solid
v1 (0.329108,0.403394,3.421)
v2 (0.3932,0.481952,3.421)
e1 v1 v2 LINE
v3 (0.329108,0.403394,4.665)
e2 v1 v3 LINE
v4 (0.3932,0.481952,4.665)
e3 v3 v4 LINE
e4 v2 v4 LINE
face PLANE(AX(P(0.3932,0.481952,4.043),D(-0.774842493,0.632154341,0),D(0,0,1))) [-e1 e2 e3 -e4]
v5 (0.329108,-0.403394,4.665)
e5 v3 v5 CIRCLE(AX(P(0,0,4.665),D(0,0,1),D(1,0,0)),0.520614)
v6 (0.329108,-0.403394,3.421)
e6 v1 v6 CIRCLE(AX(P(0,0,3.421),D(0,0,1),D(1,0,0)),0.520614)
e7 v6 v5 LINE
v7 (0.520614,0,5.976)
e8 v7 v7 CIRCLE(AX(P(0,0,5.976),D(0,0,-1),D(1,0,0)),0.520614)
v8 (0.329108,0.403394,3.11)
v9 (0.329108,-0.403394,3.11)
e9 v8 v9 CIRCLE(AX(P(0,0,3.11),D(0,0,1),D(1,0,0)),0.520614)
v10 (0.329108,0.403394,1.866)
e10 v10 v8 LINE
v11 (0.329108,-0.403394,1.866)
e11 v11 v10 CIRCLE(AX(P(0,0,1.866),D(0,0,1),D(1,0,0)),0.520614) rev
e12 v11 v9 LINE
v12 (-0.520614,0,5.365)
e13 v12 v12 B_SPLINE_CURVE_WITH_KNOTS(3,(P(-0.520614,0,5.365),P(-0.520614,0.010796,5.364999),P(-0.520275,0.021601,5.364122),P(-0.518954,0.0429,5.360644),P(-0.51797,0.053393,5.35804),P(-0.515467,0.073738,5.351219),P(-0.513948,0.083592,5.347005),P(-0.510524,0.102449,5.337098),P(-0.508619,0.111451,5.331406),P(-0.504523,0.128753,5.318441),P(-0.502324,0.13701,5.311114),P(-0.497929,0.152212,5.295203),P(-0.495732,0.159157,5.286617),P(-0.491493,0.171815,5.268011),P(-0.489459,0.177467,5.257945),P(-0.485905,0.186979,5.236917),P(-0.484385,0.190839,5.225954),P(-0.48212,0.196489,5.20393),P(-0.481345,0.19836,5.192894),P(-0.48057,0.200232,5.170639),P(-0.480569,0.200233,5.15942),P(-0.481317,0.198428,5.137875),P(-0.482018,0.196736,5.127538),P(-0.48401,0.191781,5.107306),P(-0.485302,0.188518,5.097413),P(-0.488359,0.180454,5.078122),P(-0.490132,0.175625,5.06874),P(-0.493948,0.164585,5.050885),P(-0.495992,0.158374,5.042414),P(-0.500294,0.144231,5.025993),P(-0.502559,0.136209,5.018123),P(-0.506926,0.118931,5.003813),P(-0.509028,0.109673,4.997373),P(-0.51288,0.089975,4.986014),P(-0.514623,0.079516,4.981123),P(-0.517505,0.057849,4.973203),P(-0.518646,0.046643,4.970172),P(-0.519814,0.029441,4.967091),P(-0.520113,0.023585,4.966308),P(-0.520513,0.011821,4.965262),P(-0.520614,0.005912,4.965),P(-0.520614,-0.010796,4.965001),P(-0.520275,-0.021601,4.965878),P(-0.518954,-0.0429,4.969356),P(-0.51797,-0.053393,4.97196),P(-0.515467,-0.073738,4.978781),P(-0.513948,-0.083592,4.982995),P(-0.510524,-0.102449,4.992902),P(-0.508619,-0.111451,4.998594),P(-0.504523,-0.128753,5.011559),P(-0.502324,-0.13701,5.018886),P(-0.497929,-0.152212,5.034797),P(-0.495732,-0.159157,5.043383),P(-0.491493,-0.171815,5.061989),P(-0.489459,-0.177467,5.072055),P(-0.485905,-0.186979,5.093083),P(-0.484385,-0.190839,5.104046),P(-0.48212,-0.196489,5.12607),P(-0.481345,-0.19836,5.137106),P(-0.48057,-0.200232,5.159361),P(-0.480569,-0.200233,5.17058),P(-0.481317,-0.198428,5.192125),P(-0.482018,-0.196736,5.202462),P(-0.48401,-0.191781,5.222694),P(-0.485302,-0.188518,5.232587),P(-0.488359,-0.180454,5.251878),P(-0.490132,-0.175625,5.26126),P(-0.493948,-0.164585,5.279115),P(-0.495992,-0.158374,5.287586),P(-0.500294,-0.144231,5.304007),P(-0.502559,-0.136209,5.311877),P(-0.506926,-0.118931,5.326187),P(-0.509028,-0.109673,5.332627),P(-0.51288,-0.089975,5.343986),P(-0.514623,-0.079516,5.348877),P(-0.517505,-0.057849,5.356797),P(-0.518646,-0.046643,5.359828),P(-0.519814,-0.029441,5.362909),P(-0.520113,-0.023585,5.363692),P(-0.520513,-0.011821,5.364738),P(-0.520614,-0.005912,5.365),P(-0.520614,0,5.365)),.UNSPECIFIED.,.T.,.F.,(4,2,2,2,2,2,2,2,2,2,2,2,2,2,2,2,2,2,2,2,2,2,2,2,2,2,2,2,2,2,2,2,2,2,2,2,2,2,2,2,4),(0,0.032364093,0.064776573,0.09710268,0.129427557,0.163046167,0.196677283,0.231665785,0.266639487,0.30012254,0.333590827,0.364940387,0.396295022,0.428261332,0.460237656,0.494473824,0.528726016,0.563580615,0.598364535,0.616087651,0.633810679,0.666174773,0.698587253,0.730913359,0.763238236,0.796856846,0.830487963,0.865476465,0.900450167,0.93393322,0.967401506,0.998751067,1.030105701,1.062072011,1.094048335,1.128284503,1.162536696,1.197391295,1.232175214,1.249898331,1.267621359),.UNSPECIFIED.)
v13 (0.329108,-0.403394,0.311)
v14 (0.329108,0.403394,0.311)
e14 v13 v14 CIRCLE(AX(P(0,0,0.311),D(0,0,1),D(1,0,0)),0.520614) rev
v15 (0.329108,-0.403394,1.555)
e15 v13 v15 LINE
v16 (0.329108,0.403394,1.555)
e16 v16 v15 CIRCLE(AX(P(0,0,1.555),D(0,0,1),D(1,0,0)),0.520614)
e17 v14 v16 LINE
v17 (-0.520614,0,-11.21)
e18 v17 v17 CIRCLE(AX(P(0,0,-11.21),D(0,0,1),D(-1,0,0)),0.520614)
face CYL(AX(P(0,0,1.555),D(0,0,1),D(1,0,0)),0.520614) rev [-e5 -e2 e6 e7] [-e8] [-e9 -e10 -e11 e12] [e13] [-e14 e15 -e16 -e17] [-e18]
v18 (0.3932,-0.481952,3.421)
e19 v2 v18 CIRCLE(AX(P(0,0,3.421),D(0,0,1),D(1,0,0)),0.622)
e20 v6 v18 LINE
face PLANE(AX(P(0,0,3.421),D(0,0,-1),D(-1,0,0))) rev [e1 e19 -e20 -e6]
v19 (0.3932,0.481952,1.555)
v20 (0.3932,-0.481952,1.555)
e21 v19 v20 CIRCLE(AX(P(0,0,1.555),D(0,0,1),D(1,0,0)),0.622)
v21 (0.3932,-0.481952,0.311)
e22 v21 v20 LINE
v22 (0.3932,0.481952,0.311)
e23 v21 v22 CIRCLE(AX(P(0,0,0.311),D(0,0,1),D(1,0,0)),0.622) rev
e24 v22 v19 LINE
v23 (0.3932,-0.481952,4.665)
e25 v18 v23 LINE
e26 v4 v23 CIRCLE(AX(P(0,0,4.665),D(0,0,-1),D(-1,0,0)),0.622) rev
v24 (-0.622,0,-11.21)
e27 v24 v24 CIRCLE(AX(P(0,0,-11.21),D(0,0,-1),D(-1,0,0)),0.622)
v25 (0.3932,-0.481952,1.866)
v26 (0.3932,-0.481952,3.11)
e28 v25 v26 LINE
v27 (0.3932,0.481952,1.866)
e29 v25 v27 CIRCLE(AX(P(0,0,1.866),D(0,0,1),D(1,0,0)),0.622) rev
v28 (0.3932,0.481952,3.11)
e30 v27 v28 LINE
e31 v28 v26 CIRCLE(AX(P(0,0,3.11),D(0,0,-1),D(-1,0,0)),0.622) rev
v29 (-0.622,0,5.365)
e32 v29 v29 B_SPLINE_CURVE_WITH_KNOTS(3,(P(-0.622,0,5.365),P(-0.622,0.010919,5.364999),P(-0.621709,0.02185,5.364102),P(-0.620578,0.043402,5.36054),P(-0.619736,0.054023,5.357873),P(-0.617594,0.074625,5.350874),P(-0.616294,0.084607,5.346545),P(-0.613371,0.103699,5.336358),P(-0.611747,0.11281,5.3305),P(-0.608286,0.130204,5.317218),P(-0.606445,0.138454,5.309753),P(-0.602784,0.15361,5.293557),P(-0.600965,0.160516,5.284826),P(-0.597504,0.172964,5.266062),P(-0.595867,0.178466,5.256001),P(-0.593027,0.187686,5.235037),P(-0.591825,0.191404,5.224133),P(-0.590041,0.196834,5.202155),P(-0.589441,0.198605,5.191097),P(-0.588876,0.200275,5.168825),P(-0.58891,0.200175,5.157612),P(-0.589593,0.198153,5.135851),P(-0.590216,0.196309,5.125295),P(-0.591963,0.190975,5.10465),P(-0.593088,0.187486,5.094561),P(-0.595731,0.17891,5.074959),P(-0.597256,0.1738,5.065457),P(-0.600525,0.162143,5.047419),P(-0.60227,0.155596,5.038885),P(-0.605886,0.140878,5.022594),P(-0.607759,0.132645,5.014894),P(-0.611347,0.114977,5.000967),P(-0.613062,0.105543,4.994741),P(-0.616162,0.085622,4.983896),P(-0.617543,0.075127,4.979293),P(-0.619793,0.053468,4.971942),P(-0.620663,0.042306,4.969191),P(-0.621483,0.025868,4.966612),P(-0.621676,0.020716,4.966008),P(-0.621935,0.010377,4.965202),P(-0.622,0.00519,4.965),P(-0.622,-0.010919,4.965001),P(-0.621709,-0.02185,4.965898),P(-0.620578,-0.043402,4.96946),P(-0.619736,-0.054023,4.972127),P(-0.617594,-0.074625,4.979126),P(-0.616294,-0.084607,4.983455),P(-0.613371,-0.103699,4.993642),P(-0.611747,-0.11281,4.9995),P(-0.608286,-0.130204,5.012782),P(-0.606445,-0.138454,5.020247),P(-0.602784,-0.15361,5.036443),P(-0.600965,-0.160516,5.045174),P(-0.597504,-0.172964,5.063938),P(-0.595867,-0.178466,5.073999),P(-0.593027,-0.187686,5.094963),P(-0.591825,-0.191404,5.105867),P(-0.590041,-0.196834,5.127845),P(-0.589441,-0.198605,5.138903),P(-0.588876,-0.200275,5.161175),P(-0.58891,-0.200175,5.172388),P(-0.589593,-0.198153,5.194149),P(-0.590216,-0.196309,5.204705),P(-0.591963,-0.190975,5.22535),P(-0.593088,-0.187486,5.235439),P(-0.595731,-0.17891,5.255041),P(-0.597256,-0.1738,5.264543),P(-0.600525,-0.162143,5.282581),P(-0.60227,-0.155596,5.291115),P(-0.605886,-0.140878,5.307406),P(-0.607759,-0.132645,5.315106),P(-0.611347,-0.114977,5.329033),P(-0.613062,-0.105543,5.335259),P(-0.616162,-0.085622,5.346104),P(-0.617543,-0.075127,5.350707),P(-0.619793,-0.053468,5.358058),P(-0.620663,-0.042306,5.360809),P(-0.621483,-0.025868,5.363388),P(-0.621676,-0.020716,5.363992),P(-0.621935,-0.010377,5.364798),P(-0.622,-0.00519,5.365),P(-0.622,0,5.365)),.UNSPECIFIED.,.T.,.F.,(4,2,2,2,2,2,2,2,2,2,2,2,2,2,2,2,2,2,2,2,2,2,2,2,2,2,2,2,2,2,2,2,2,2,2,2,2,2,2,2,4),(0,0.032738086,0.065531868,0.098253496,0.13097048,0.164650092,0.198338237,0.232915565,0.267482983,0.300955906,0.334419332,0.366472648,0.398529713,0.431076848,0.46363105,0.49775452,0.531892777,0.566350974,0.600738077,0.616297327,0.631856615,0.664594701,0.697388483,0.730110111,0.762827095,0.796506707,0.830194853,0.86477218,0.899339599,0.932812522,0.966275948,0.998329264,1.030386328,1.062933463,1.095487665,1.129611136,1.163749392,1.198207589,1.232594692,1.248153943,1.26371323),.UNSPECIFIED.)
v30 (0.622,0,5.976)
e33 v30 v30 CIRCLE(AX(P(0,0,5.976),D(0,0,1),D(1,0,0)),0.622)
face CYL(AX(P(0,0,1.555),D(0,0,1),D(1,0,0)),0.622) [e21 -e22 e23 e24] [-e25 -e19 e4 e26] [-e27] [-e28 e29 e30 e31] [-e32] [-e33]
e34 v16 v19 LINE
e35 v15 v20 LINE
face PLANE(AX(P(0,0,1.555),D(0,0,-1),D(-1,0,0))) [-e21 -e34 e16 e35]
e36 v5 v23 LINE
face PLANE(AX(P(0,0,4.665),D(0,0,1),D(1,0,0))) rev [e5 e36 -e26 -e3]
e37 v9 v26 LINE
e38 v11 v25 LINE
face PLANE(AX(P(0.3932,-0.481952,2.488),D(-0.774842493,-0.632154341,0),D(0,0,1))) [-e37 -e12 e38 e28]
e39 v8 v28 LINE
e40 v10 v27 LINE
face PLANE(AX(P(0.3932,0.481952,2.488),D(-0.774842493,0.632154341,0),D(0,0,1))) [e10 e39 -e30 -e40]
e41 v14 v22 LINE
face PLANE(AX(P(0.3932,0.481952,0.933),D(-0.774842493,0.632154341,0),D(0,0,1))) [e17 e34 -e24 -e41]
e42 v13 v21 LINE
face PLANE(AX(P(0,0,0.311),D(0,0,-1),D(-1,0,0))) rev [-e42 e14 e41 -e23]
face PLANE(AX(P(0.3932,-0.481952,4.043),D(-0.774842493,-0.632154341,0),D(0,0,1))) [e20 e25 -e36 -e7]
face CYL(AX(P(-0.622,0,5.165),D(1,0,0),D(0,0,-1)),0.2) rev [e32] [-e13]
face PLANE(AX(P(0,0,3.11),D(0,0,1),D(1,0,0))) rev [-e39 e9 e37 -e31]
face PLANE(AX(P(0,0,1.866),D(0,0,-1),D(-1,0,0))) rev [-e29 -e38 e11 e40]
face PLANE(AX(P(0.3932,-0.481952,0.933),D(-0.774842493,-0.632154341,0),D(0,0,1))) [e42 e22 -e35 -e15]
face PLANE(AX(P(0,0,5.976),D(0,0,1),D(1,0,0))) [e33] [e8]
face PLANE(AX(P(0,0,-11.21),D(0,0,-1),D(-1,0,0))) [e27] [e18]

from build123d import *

# Parameters (mm, degrees)
SURFACE_EXTRUDE1_1_DEPTH   = 1.866
SURFACE_TRIM1_TOOL_2_BACK  = 3.327
SURFACE_TRIM1_TOOL_2_DEPTH = 6.654
THICKEN2_T1                = 0.101386
LPATTERN3_COUNT            = 3
LPATTERN3_PITCH            = 1.555
BOSS_EXTRUDE1_DEPTH        = 11.21
BOSS_EXTRUDE2_DEPTH        = 1
SKETCH7_R                  = 0.2
CUT_EXTRUDE2_DEPTH         = 12.244459436


with BuildPart() as body_1:
    # Surface-Extrude1: a surface, the sketch's curves swept straight by 1.866 mm
    with BuildLine(Plane.XY, mode=Mode.PRIVATE) as surface_extrude1_1_path:
        ThreePointArc((0.622, 0), (0, 0.622), (-0.622, 0))
    surface_extrude1_1 = Shell.extrude(surface_extrude1_1_path.wire(), (0 * SURFACE_EXTRUDE1_1_DEPTH, 0 * SURFACE_EXTRUDE1_1_DEPTH, 1 * SURFACE_EXTRUDE1_1_DEPTH))
    # Surface-Trim1 tool: a surface, the sketch's curves swept straight by 6.654 mm
    with BuildLine(Plane(origin=(0, 0, 0), x_dir=(1, 0, 0), z_dir=(0, 1, 0)).offset(-SURFACE_TRIM1_TOOL_2_BACK), mode=Mode.PRIVATE) as surface_trim1_tool_2_path:
        Line((-0.622, -1.555), (0.3932, -1.555))
        Line((0.3932, -1.555), (0.3932, -0.311))
        Line((0.3932, -0.311), (-0.622, -0.311))
    surface_trim1_tool_2 = Shell.extrude(surface_trim1_tool_2_path.wire(), (0 * SURFACE_TRIM1_TOOL_2_DEPTH, 1 * SURFACE_TRIM1_TOOL_2_DEPTH, 0 * SURFACE_TRIM1_TOOL_2_DEPTH))
    # Surface-Trim1: the surface trimmed, the side behind the tool kept
    surface_trim1_3 = split(surface_extrude1_1.faces()[0], bisect_by=surface_trim1_tool_2, keep=Keep.BOTTOM).faces()[0]
    add(Solid.thicken(surface_trim1_3, THICKEN2_T1))


with BuildPart() as lpattern3_1:
    # LPattern3: pattern copy
    add(body_1.part.moved(Location(Vector(0, 0, 1) * (1 * LPATTERN3_PITCH))))


with BuildPart() as lpattern3_2:
    # LPattern3: pattern copy
    add(body_1.part.moved(Location(Vector(0, 0, 1) * (2 * LPATTERN3_PITCH))))


with BuildPart() as body_1_1:
    add(body_1.part)

    # Combine1: read off the stored shape, not the designer's step
    # Combine1: union LPattern3_2, LPattern3_1
    add(lpattern3_2.part)
    add(lpattern3_1.part)

    # Sketch5 → Boss-Extrude1 (add)
    with BuildSketch(Plane(origin=(0, 0, 0), x_dir=(-1, 0, 0), z_dir=(0, 0, -1))):
        with BuildLine():
            Line((-0.622, 0), (-0.520614, 0))
            ThreePointArc((-0.520614, 0), (0, 0.520614), (0.520614, 0))
            Line((0.520614, 0), (0.622, 0))
            ThreePointArc((0.622, 0), (0, 0.622), (-0.622, 0))
        make_face()
    extrude(amount=BOSS_EXTRUDE1_DEPTH)

    # Sketch6 → Boss-Extrude2 (add)
    with BuildSketch(Plane.XY.offset(4.976)):
        with BuildLine():
            Line((-0.622, 0), (-0.520614, 0))
            ThreePointArc((-0.520614, 0), (0, 0.520614), (0.520614, 0))
            Line((0.520614, 0), (0.622, 0))
            ThreePointArc((0.622, 0), (0, 0.622), (-0.622, 0))
        make_face()
    extrude(amount=BOSS_EXTRUDE2_DEPTH)

    # Sketch7 → Cut-Extrude2 (cut, through all)
    with BuildSketch(Plane(origin=(0, 0, 0), x_dir=(0, 0, -1), z_dir=(1, 0, 0))):
        with Locations((-5.165, 0)):
            Circle(SKETCH7_R)
    extrude(amount=-CUT_EXTRUDE2_DEPTH, mode=Mode.SUBTRACT)

    # Mirror1: body 1 across face


with BuildPart() as body_1_2:
    add(body_1_1.part)
    add(body_1_1.part.mirror(Plane(origin=(0.571307, 0, -2.617), x_dir=(0, 0, 1), z_dir=(0, -1, 0))))


solid = body_1_2.part
